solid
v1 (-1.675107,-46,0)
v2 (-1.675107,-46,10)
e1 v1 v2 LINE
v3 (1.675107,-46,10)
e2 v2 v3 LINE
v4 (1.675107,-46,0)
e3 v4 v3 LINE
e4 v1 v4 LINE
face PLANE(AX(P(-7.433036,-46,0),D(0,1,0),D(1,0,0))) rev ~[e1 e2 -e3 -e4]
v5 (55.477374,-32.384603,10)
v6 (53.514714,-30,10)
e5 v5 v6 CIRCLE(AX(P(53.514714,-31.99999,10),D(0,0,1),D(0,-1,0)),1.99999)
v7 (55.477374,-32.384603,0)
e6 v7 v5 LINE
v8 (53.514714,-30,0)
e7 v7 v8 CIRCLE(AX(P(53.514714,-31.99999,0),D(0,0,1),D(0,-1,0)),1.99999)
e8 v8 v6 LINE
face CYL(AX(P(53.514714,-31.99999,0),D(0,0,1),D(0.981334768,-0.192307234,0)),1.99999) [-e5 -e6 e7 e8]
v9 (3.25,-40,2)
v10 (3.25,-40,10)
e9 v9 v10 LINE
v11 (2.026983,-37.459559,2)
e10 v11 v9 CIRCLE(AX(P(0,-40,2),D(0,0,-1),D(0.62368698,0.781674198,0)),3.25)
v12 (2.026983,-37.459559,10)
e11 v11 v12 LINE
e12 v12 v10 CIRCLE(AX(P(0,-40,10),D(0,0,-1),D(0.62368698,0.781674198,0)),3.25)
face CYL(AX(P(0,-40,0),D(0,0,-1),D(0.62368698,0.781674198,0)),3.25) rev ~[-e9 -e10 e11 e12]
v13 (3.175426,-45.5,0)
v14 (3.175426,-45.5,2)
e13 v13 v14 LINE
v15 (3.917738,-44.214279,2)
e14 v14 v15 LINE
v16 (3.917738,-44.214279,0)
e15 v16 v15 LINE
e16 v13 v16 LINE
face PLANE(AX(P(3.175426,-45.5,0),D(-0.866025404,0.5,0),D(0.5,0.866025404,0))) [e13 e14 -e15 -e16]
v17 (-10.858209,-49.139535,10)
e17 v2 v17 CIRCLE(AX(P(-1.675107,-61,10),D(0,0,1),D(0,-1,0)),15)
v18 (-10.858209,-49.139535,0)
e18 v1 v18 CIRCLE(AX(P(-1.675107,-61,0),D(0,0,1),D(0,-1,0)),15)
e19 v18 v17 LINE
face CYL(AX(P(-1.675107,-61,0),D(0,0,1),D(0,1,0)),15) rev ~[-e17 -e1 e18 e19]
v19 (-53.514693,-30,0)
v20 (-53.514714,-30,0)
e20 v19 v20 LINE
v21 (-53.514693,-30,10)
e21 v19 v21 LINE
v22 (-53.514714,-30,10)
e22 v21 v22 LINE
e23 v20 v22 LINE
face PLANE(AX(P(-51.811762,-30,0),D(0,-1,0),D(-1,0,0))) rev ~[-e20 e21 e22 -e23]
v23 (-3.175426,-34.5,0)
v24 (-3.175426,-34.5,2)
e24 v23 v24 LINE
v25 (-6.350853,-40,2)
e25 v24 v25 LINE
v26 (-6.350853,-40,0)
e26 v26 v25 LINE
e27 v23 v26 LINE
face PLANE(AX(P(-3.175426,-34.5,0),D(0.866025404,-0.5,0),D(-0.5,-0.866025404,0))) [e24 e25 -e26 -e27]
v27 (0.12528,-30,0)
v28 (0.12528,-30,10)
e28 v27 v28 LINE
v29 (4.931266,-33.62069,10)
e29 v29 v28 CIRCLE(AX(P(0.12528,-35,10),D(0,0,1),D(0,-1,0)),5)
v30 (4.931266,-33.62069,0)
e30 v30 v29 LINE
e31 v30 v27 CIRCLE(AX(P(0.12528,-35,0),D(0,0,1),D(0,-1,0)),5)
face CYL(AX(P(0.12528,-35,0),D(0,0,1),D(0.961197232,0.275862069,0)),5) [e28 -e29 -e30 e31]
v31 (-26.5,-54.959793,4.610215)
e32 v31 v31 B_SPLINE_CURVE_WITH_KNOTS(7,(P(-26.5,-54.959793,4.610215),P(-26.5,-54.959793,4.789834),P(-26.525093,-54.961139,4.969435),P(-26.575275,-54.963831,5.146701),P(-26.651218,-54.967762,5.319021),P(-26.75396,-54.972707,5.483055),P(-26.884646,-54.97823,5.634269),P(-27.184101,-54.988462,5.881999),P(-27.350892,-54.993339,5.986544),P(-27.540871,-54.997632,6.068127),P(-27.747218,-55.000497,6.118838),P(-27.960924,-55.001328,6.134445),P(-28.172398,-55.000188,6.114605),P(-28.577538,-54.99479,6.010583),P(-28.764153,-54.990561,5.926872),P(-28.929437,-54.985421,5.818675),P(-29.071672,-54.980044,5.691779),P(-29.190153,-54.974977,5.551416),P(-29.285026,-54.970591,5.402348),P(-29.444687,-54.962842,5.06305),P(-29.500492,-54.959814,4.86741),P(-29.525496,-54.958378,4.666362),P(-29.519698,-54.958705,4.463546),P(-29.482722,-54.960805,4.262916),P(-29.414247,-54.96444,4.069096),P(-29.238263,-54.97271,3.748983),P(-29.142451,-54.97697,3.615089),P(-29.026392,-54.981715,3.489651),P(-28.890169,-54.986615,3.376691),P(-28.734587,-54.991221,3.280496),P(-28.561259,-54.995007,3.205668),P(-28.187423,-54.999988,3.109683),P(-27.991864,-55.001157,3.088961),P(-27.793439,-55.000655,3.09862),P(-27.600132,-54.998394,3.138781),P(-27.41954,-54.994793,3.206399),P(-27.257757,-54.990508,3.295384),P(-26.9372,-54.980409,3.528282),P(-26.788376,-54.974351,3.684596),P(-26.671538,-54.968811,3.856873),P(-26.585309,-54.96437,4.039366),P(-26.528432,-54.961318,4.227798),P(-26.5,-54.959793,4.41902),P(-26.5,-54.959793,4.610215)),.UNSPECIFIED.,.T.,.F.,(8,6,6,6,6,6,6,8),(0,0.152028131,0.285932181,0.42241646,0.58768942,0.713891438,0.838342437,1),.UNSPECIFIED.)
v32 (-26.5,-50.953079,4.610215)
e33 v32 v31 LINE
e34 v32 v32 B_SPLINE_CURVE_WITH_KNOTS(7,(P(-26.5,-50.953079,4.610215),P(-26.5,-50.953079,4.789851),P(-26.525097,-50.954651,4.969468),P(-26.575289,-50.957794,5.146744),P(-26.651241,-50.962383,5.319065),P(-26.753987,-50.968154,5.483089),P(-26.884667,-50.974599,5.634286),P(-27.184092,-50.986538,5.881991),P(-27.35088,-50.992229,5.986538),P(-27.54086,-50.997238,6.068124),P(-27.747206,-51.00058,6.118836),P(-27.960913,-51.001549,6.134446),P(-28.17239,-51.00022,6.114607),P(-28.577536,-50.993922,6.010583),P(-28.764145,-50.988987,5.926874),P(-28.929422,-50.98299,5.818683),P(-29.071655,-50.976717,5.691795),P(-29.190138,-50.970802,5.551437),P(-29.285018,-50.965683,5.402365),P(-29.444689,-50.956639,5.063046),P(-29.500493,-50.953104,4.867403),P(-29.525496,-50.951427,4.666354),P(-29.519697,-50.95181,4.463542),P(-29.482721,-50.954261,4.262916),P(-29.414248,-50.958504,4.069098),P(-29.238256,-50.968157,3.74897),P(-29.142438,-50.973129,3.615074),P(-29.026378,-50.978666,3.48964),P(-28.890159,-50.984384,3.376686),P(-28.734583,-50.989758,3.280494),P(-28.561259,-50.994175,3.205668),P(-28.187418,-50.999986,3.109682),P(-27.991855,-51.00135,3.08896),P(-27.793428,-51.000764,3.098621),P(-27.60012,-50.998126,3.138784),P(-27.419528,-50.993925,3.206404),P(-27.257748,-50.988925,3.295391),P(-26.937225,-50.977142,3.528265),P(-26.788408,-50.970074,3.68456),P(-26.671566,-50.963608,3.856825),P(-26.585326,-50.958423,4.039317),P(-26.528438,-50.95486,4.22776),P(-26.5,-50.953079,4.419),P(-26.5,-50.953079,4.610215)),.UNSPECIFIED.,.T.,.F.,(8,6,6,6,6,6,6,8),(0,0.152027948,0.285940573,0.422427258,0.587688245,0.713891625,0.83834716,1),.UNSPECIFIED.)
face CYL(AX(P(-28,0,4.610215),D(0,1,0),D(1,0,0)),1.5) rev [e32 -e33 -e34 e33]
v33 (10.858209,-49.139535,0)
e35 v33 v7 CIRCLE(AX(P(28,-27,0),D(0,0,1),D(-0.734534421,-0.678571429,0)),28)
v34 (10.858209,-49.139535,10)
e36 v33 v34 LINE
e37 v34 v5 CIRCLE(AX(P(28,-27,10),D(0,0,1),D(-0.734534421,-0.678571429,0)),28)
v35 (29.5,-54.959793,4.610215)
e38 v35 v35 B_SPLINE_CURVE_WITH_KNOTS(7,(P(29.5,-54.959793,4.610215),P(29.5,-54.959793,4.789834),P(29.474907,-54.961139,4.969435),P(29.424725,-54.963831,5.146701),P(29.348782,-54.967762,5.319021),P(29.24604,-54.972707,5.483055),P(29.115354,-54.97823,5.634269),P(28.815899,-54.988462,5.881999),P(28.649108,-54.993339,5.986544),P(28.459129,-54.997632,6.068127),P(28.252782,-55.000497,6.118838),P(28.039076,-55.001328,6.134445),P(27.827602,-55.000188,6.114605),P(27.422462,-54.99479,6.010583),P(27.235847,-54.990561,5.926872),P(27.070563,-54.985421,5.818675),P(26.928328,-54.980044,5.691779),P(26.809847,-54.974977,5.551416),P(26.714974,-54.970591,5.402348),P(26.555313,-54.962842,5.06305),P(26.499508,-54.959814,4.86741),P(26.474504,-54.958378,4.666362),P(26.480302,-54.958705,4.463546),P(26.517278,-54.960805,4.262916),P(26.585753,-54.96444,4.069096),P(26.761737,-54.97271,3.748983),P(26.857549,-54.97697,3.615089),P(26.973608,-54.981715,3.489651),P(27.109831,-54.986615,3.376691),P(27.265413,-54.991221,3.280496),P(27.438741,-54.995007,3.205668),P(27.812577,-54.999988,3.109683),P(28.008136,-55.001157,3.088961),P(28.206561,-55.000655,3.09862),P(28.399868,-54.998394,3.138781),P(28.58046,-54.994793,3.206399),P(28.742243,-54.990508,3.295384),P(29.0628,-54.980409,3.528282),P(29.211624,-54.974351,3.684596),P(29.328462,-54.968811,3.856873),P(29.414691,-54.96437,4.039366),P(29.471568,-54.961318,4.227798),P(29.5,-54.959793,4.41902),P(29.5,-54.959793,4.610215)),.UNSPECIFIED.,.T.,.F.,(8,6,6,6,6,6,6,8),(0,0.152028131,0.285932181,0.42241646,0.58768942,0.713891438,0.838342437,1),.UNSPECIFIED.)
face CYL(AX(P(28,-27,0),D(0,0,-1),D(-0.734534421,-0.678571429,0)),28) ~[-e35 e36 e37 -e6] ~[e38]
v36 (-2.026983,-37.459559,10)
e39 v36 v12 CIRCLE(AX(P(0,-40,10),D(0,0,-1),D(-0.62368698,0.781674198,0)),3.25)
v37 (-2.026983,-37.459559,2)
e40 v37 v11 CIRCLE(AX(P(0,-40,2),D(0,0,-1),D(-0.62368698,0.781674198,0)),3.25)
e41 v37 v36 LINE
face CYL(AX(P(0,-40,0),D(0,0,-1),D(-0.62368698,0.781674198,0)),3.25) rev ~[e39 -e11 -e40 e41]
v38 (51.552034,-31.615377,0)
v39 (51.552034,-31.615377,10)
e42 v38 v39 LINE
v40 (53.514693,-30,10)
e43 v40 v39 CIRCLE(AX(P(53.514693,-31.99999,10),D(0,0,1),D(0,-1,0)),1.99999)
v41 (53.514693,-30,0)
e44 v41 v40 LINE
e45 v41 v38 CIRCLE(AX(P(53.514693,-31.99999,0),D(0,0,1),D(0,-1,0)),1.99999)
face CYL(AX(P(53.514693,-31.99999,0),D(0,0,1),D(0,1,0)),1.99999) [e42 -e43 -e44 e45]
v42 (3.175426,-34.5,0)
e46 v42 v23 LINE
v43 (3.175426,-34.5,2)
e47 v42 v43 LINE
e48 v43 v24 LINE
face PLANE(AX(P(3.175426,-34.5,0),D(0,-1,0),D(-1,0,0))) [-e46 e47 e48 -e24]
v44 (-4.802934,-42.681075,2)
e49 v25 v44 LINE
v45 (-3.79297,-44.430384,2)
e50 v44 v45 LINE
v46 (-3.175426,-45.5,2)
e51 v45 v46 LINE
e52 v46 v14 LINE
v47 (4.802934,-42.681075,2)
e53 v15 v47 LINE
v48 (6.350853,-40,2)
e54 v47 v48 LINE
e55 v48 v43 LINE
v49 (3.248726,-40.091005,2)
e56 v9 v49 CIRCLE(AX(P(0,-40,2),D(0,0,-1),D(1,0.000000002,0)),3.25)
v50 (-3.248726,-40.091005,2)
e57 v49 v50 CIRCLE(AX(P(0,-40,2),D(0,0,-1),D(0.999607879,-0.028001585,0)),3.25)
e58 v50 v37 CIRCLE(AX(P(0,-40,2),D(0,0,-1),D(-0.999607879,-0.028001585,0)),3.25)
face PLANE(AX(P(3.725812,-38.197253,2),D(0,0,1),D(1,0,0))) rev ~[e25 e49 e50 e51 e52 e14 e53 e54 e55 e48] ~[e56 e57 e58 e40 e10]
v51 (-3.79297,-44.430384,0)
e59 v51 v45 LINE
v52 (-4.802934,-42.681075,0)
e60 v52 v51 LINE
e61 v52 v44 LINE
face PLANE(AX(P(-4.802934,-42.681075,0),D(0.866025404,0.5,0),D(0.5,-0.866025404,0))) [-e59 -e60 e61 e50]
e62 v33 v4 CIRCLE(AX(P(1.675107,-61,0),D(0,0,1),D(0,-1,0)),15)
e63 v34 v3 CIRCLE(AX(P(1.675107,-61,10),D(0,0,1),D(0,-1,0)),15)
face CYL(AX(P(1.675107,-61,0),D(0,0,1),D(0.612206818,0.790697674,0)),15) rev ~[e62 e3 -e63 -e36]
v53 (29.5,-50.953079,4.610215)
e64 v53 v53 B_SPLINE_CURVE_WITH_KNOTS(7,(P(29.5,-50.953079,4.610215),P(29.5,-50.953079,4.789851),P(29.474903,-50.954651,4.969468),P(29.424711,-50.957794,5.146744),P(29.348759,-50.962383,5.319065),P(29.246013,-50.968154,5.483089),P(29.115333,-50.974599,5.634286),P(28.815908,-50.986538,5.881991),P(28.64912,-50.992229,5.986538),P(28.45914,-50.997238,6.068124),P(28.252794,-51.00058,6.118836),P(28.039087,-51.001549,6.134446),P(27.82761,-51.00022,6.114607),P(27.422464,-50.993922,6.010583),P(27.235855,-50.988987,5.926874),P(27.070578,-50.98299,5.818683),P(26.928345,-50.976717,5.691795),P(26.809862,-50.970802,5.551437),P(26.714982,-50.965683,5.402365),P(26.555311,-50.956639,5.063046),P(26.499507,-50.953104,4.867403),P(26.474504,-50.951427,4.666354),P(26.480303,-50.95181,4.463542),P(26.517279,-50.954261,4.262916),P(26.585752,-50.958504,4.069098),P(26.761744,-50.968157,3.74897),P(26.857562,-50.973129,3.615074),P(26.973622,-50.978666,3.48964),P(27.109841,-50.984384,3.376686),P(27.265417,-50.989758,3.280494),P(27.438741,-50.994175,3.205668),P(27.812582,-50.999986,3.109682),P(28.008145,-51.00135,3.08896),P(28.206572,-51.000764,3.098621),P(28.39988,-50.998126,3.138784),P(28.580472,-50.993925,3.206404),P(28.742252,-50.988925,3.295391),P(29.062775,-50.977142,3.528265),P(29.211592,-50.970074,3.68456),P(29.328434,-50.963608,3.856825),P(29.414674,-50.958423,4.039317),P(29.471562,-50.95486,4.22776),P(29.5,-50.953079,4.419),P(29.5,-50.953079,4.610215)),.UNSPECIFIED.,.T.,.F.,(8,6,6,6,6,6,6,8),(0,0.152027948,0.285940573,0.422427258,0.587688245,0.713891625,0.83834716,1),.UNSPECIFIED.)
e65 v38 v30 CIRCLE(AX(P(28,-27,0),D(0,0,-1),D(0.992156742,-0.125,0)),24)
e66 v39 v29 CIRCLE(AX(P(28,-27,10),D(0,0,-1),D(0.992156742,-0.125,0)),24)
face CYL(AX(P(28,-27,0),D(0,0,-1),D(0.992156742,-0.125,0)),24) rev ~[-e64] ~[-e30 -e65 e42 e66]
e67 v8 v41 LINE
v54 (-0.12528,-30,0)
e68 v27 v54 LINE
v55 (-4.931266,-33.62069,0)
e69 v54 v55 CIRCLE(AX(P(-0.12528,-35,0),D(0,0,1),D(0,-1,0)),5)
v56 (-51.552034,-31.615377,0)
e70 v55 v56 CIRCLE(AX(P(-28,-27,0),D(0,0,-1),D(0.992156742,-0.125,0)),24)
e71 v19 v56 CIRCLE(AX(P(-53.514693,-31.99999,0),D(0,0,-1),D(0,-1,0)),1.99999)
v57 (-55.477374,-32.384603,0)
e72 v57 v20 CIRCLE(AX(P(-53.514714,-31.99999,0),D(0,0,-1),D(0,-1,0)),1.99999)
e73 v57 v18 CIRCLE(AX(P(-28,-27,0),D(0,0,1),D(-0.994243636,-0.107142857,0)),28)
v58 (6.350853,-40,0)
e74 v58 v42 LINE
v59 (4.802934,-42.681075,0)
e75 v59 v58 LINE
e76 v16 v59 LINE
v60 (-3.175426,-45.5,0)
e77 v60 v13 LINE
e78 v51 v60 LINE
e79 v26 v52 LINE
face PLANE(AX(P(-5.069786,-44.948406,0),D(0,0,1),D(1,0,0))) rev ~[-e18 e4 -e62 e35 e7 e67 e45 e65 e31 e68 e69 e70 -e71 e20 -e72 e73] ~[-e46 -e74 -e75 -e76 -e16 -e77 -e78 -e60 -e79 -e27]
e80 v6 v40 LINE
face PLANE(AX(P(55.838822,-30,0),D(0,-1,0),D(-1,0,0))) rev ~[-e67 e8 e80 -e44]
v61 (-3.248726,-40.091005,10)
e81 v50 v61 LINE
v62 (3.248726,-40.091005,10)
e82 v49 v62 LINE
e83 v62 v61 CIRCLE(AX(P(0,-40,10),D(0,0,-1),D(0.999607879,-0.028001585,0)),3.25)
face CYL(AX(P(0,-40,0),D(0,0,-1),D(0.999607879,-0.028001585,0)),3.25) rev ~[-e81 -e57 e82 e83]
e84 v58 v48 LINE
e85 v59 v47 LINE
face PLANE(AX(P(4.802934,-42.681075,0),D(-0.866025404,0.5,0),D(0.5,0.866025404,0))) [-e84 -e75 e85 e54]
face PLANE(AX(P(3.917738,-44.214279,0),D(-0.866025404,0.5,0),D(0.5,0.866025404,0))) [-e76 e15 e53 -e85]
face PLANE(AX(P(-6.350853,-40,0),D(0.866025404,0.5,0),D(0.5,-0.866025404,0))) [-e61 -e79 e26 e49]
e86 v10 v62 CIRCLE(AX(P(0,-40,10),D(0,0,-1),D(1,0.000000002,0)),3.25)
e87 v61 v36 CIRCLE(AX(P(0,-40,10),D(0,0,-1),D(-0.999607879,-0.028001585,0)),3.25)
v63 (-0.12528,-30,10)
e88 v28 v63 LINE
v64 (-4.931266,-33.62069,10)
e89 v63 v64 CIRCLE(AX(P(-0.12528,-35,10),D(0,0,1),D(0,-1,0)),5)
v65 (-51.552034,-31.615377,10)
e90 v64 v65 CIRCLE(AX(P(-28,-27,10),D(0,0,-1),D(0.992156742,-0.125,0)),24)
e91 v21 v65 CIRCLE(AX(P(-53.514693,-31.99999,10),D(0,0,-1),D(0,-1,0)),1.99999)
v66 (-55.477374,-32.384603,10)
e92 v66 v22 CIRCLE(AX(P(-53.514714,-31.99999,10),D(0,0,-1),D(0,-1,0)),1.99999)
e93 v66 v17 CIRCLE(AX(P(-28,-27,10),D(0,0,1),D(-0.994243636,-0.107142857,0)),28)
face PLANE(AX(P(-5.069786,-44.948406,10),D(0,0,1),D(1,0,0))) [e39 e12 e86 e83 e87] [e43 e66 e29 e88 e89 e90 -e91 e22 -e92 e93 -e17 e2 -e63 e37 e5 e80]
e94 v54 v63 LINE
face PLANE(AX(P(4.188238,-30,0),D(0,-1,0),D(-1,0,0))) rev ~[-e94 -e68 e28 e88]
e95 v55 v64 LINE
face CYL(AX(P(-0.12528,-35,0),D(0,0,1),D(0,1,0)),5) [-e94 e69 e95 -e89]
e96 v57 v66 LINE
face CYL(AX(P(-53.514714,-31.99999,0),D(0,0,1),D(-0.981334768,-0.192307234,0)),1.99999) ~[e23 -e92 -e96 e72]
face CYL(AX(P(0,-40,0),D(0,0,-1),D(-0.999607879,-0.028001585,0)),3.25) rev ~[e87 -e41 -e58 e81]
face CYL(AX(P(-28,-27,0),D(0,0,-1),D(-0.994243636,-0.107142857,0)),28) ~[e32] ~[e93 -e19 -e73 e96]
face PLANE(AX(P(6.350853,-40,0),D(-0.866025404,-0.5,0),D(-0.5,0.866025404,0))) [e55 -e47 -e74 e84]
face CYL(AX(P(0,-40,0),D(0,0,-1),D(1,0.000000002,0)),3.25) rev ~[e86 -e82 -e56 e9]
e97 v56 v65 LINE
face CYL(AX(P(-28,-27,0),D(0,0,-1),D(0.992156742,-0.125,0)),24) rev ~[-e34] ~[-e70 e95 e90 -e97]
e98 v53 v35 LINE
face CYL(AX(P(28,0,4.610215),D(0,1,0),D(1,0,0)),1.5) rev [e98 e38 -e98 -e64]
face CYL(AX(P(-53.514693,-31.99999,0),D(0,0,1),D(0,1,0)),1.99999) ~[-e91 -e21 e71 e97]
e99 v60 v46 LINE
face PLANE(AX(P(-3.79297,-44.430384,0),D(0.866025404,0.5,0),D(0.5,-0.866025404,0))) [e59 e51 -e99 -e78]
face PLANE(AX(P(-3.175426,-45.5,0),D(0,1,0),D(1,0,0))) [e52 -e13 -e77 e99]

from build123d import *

# Parameters (mm, degrees)
F1_DEPTH = 10
F2_R     = 5
F3_R     = 15
F4_R     = 1.99999
F5_R     = 1.5
F6_DEPTH = 70
F7_DEPTH = 2


# Not quite as in the source:
# - a fillet or chamfer is up to 0.001 mm smaller than in the source, because OpenCascade refuses the exact size
# - a feature names something its author has since deleted; it is built from what else it names


with BuildPart() as f1:
    # F0 (on Top) → F1 (new body)
    with BuildSketch(Plane.XY):
        with BuildLine():
            ThreePointArc((-4.8029336206, -42.6810749437), (-6.0551509394, -44.3903306382), (-7.4330361988, -46))
            Line((-7.4330361988, -46), (-2.8867513459, -46))
            Line((-2.8867513459, -46), (-3.1754264805, -45.5))
            Line((-3.1754264805, -45.5), (-3.7929698378, -44.4303835293))
            Line((-3.7929698378, -44.4303835293), (-4.8029336206, -42.6810749437))
        make_face()
        with BuildLine():
            Line((4.1882382004, -30), (0.1611781858, -30))
            ThreePointArc((0.1611781858, -30), (0.4999682243, -32.2676609927), (1.0231580796, -34.5))
            Line((1.0231580796, -34.5), (3.1754264805, -34.5))
            Line((3.1754264805, -34.5), (6.3508529611, -40))
            Line((6.3508529611, -40), (4.8029336206, -42.6810749437))
            ThreePointArc((4.8029336206, -42.6810749437), (6.0551509394, -44.3903306382), (7.4330361988, -46))
            Line((7.4330361988, -46), (8, -46))
            Line((8, -46), (8, -40.2664991614))
            ThreePointArc((8, -40.2664991614), (5.5007140279, -35.3535699402), (4.1882382004, -30))
        make_face()
        with BuildLine():
            Line((-51.8117617996, -30), (-55.8388218142, -30))
            ThreePointArc((-55.8388218142, -30), (-36.7874899568, -53.585334684), (-7.4330361988, -46))
            Line((-7.4330361988, -46), (-8, -46))
            Line((-8, -46), (-8, -40.2664991614))
            ThreePointArc((-8, -40.2664991614), (-33.4756399865, -50.367014502), (-51.8117617996, -30))
        make_face()
        with BuildLine():
            ThreePointArc((51.8117617996, -30), (33.4756399865, -50.367014502), (8, -40.2664991614))
            Line((8, -40.2664991614), (8, -46))
            Line((8, -46), (7.4330361988, -46))
            ThreePointArc((7.4330361988, -46), (36.7874899568, -53.585334684), (55.8388218142, -30))
            Line((55.8388218142, -30), (51.8117617996, -30))
        make_face()
        with BuildLine():
            ThreePointArc((-4.1882382004, -30), (-5.5007140279, -35.3535699402), (-8, -40.2664991614))
            Line((-8, -40.2664991614), (-8, -46))
            Line((-8, -46), (-7.4330361988, -46))
            ThreePointArc((-7.4330361988, -46), (-6.0551509394, -44.3903306382), (-4.8029336206, -42.6810749437))
            Line((-4.8029336206, -42.6810749437), (-6.3508529611, -40))
            Line((-6.3508529611, -40), (-3.1754264805, -34.5))
            Line((-3.1754264805, -34.5), (-1.0231580796, -34.5))
            ThreePointArc((-1.0231580796, -34.5), (-0.4999682243, -32.2676609927), (-0.1611781858, -30))
            Line((-0.1611781858, -30), (-4.1882382004, -30))
        make_face()
        with BuildLine():
            Line((1.0231580796, -34.5), (-1.0231580796, -34.5))
            ThreePointArc((-1.0231580796, -34.5), (-1.4837475224, -35.993795336), (-2.0269826837, -37.4595588572))
            ThreePointArc((-2.0269826837, -37.4595588572), (0, -36.75), (2.0269826837, -37.4595588572))
            ThreePointArc((2.0269826837, -37.4595588572), (1.4837475224, -35.993795336), (1.0231580796, -34.5))
        make_face()
        with BuildLine():
            Line((2.8867513459, -46), (7.4330361988, -46))
            ThreePointArc((7.4330361988, -46), (6.0551509394, -44.3903306382), (4.8029336206, -42.6810749437))
            Line((4.8029336206, -42.6810749437), (3.917737902, -44.2142789029))
            Line((3.917737902, -44.2142789029), (3.1754264805, -45.5))
            Line((3.1754264805, -45.5), (2.8867513459, -46))
        make_face()
        with BuildLine():
            ThreePointArc((-2.0269826837, -37.4595588572), (-1.4837475224, -35.993795336), (-1.0231580796, -34.5))
            Line((-1.0231580796, -34.5), (-3.1754264805, -34.5))
            Line((-3.1754264805, -34.5), (-6.3508529611, -40))
            Line((-6.3508529611, -40), (-4.8029336206, -42.6810749437))
            ThreePointArc((-4.8029336206, -42.6810749437), (-3.9908775438, -41.4070135311), (-3.2487256059, -40.0910051512))
            ThreePointArc((-3.2487256059, -40.0910051512), (-2.9477791452, -38.631388254), (-2.0269826837, -37.4595588572))
        make_face()
        with BuildLine():
            Line((0.1611781858, -30), (-0.1611781858, -30))
            ThreePointArc((-0.1611781858, -30), (-0.4999682243, -32.2676609927), (-1.0231580796, -34.5))
            Line((-1.0231580796, -34.5), (1.0231580796, -34.5))
            ThreePointArc((1.0231580796, -34.5), (0.4999682243, -32.2676609927), (0.1611781858, -30))
        make_face()
        with BuildLine():
            Line((3.1754264805, -34.5), (1.0231580796, -34.5))
            ThreePointArc((1.0231580796, -34.5), (1.4837475224, -35.993795336), (2.0269826837, -37.4595588572))
            ThreePointArc((2.0269826837, -37.4595588572), (2.9283266315, -38.5902471355), (3.25, -40))
            ThreePointArc((3.25, -40), (3.2496813859, -40.0455070369), (3.2487256059, -40.0910051512))
            ThreePointArc((3.2487256059, -40.0910051512), (3.9908775438, -41.4070135311), (4.8029336206, -42.6810749437))
            Line((4.8029336206, -42.6810749437), (6.3508529611, -40))
            Line((6.3508529611, -40), (3.1754264805, -34.5))
        make_face()
        with BuildLine():
            ThreePointArc((-3.2487256059, -40.0910051512), (-3.9908775438, -41.4070135311), (-4.8029336206, -42.6810749437))
            Line((-4.8029336206, -42.6810749437), (-3.7929698378, -44.4303835293))
            Line((-3.7929698378, -44.4303835293), (-3.1754264805, -45.5))
            Line((-3.1754264805, -45.5), (3.1754264805, -45.5))
            Line((3.1754264805, -45.5), (3.917737902, -44.2142789029))
            Line((3.917737902, -44.2142789029), (4.8029336206, -42.6810749437))
            ThreePointArc((4.8029336206, -42.6810749437), (3.9908775438, -41.4070135311), (3.2487256059, -40.0910051512))
            ThreePointArc((3.2487256059, -40.0910051512), (0, -43.25), (-3.2487256059, -40.0910051512))
        make_face()
        Polygon((-3.1754264805, -45.5), (-2.8867513459, -46), (2.8867513459, -46), (3.1754264805, -45.5), align=None)
    extrude(amount=F1_DEPTH)

    # F2
    f2_edges = [f1.edges().sort_by_distance(p)[0] for p in [
        (-4.188238, -30, 5),
        (4.188238, -30, 5),
    ]]
    fillet(f2_edges, radius=F2_R)

    # F3
    f3_edges = [f1.edges().sort_by_distance(p)[0] for p in [
        (-7.433036, -46, 5),
        (7.433036, -46, 5),
    ]]
    fillet(f3_edges, radius=F3_R)

    # F4 (radius 2 in the source; OpenCascade refuses exactly that, so slightly less here)
    f4_edges = [f1.edges().sort_by_distance(p)[0] for p in [
        (-55.838822, -30, 5),
        (-51.811762, -30, 5),
        (51.811762, -30, 5),
        (55.838822, -30, 5),
    ]]
    fillet(f4_edges, radius=F4_R)

    # F5 (on Front) → F6 (cut)
    with BuildSketch(Plane.XZ):
        with Locations((-28, 4.6102153137)):
            Circle(F5_R)
        with Locations((28, 4.6102153137)):
            Circle(F5_R)
    extrude(amount=F6_DEPTH, mode=Mode.SUBTRACT)

    # F0 (on Top) → F7 (cut)
    with BuildSketch(Plane.XY):
        with BuildLine():
            Line((3.1754264805, -34.5), (1.0231580796, -34.5))
            ThreePointArc((1.0231580796, -34.5), (1.4837475224, -35.993795336), (2.0269826837, -37.4595588572))
            ThreePointArc((2.0269826837, -37.4595588572), (2.9283266315, -38.5902471355), (3.25, -40))
            ThreePointArc((3.25, -40), (3.2496813859, -40.0455070369), (3.2487256059, -40.0910051512))
            ThreePointArc((3.2487256059, -40.0910051512), (3.9908775438, -41.4070135311), (4.8029336206, -42.6810749437))
            Line((4.8029336206, -42.6810749437), (6.3508529611, -40))
            Line((6.3508529611, -40), (3.1754264805, -34.5))
        make_face()
        with BuildLine():
            Line((1.0231580796, -34.5), (-1.0231580796, -34.5))
            ThreePointArc((-1.0231580796, -34.5), (-1.4837475224, -35.993795336), (-2.0269826837, -37.4595588572))
            ThreePointArc((-2.0269826837, -37.4595588572), (0, -36.75), (2.0269826837, -37.4595588572))
            ThreePointArc((2.0269826837, -37.4595588572), (1.4837475224, -35.993795336), (1.0231580796, -34.5))
        make_face()
        with BuildLine():
            ThreePointArc((-2.0269826837, -37.4595588572), (-1.4837475224, -35.993795336), (-1.0231580796, -34.5))
            Line((-1.0231580796, -34.5), (-3.1754264805, -34.5))
            Line((-3.1754264805, -34.5), (-6.3508529611, -40))
            Line((-6.3508529611, -40), (-4.8029336206, -42.6810749437))
            ThreePointArc((-4.8029336206, -42.6810749437), (-3.9908775438, -41.4070135311), (-3.2487256059, -40.0910051512))
            ThreePointArc((-3.2487256059, -40.0910051512), (-2.9477791452, -38.631388254), (-2.0269826837, -37.4595588572))
        make_face()
        with BuildLine():
            ThreePointArc((-3.2487256059, -40.0910051512), (-3.9908775438, -41.4070135311), (-4.8029336206, -42.6810749437))
            Line((-4.8029336206, -42.6810749437), (-3.7929698378, -44.4303835293))
            Line((-3.7929698378, -44.4303835293), (-3.1754264805, -45.5))
            Line((-3.1754264805, -45.5), (3.1754264805, -45.5))
            Line((3.1754264805, -45.5), (3.917737902, -44.2142789029))
            Line((3.917737902, -44.2142789029), (4.8029336206, -42.6810749437))
            ThreePointArc((4.8029336206, -42.6810749437), (3.9908775438, -41.4070135311), (3.2487256059, -40.0910051512))
            ThreePointArc((3.2487256059, -40.0910051512), (0, -43.25), (-3.2487256059, -40.0910051512))
        make_face()
    extrude(amount=F7_DEPTH, mode=Mode.SUBTRACT)


solid = f1.part
